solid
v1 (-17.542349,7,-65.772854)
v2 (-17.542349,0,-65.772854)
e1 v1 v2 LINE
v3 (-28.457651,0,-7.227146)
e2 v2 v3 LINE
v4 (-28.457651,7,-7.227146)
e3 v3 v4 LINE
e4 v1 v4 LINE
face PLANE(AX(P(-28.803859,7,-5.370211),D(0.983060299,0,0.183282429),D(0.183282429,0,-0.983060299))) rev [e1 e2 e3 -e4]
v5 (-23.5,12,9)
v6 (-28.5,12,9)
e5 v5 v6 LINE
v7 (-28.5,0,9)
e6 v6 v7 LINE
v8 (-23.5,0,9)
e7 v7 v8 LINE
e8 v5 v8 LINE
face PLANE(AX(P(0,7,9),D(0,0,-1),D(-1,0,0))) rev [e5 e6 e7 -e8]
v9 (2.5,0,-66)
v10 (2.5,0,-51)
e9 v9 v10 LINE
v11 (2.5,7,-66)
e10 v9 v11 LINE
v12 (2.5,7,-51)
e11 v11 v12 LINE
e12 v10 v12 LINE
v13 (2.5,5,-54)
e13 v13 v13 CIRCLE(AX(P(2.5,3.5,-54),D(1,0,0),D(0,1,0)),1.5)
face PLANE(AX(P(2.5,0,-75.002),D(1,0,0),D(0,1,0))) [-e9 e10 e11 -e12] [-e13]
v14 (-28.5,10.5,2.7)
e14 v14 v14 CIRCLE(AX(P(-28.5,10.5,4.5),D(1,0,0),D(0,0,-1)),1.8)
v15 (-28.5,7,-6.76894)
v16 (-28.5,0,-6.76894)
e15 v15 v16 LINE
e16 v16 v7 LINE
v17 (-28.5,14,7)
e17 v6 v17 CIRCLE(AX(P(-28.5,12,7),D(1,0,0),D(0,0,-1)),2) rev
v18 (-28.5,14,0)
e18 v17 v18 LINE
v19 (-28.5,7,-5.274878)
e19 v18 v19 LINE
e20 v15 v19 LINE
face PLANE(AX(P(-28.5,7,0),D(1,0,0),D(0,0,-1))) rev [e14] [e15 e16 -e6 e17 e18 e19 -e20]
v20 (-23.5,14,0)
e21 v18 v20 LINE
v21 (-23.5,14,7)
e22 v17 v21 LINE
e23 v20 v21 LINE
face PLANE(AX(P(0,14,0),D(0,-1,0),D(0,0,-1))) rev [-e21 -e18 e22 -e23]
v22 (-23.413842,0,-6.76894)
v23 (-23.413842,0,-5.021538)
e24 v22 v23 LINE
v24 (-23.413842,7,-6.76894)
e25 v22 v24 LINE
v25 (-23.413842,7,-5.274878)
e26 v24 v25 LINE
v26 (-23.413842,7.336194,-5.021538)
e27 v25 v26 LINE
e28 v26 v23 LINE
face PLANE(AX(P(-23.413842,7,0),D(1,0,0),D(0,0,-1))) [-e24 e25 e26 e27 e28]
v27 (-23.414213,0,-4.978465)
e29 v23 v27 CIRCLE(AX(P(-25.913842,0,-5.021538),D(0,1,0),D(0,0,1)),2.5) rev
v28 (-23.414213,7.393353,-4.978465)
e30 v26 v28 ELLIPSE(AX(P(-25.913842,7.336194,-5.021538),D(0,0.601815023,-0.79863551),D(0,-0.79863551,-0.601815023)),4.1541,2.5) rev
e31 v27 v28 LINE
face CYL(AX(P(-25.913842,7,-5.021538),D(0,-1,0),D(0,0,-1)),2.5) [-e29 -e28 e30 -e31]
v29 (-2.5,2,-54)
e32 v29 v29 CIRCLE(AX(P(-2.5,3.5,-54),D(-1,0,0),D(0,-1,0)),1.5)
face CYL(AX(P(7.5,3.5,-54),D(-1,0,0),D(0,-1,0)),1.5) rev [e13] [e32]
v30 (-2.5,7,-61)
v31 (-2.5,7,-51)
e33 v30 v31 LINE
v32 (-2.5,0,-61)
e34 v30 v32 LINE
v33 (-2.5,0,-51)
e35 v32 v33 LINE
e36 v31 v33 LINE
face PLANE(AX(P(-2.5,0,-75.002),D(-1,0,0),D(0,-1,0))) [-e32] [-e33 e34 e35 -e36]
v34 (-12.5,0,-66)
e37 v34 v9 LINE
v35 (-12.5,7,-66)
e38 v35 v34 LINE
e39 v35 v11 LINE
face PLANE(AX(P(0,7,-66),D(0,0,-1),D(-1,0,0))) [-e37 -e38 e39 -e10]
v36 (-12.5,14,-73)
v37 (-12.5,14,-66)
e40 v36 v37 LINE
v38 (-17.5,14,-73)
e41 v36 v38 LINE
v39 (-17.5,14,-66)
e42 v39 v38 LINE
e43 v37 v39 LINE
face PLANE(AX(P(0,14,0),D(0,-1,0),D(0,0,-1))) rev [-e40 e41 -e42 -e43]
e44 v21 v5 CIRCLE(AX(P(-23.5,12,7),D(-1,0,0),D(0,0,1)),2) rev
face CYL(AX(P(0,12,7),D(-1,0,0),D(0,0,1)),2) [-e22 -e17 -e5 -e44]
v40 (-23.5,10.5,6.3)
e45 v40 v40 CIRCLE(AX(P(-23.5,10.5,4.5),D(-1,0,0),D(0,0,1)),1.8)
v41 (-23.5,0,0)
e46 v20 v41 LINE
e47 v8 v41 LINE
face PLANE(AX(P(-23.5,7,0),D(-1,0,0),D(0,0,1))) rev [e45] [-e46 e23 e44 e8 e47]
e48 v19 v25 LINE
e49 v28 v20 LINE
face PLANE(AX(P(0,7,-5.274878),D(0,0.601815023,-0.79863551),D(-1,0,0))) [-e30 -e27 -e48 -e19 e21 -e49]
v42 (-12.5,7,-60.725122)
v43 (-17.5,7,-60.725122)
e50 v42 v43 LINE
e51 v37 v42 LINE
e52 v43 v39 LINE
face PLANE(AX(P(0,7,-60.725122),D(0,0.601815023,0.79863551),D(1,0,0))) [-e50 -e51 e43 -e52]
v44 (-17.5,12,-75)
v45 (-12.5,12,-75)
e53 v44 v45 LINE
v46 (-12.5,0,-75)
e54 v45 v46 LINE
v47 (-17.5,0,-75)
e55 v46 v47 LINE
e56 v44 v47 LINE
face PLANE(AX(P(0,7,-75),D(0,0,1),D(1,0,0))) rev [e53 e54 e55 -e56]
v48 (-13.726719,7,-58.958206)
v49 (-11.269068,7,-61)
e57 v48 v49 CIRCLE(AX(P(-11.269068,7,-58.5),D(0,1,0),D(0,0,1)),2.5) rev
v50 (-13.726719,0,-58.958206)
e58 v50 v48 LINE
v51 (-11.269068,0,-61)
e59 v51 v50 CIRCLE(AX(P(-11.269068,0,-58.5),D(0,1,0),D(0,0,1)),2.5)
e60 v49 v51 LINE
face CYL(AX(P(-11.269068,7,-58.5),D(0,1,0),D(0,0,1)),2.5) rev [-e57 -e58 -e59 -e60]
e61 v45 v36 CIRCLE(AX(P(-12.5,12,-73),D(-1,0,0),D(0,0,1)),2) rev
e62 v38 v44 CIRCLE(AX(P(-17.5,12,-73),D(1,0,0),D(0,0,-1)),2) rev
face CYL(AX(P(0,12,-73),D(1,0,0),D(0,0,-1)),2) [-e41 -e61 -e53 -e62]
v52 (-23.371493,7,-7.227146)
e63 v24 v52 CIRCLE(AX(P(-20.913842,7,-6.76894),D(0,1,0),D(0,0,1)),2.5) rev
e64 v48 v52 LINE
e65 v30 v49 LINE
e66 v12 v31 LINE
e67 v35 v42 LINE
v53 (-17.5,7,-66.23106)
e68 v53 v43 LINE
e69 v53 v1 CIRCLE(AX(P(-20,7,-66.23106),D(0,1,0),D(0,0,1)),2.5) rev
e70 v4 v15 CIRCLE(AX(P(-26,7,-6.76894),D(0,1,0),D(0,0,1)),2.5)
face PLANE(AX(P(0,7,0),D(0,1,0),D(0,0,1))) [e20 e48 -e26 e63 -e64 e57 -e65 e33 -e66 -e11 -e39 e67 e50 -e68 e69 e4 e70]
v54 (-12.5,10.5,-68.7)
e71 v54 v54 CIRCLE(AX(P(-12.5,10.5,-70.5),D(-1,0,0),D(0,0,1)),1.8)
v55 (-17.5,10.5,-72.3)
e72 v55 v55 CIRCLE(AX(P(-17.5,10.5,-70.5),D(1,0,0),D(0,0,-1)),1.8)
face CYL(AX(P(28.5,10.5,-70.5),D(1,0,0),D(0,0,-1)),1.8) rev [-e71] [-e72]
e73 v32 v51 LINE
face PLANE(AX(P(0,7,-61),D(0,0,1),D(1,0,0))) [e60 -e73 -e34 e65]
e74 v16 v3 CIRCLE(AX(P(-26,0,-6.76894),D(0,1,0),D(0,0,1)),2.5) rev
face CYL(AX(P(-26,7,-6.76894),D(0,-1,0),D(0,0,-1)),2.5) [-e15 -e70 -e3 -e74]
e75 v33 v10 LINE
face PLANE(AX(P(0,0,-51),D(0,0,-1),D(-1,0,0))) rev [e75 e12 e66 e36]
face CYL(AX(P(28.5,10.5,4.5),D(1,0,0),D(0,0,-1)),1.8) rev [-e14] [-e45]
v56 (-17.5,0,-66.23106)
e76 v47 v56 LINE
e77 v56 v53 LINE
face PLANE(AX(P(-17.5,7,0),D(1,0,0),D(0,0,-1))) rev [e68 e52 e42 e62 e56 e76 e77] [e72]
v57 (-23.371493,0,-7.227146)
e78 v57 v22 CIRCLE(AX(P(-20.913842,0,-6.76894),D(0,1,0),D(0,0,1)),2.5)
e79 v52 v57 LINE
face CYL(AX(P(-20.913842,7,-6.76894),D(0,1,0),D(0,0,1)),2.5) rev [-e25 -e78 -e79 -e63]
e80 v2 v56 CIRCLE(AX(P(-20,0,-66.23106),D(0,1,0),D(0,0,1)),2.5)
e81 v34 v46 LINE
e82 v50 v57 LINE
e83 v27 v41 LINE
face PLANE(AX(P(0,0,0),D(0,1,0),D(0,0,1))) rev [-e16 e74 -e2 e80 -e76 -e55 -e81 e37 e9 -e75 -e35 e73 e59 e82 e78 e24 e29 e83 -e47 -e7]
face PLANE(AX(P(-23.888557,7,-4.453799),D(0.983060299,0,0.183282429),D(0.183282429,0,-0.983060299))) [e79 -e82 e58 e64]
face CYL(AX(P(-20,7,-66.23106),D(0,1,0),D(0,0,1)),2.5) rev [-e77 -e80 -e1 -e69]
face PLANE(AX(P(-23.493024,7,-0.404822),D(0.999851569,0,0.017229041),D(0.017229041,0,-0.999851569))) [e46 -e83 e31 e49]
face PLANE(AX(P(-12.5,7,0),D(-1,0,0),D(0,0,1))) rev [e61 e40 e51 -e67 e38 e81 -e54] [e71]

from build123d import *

# Parameters (mm, degrees)
BOSS_EXTRUDE1_DEPTH      = 7
BOSS_EXTRUDE2_START      = 7
SKETCH1_3_W              = 5
SKETCH1_3_H              = 9
BOSS_EXTRUDE2_DEPTH      = 7
M3_CLEARANCE_HOLE1_D     = 3.6
FILLET2_R                = 2.5
BOSS_EXTRUDE3_DEPTH      = 10
BOSS_EXTRUDE3_DEPTH_BACK = 5
SKETCH6_W                = 5
SKETCH6_H                = 7
SKETCH7_R                = 1.5
CUT_EXTRUDE1_DEPTH       = 10
FILLET6_R                = 2
SKETCH8_W                = 84
SKETCH8_H                = 14
CUT_EXTRUDE2_DEPTH       = 83.35289916
CHAMFER2_SIZE            = 7
CHAMFER2_SIZE_2          = 5.274878351


with BuildPart() as part:
    # Sketch1 → Boss-Extrude1 (new body)
    with BuildSketch(Plane(origin=(0, 0, 0), x_dir=(1, 0, 0), z_dir=(0, 1, 0))):
        Polygon((-23.5, -9), (-23.5, 0), (-23.413842004, 5), (-23.413842004, 7), (-13.346045394, 61), (13.346045394, 61), (23.413842004, 7), (23.413842004, 5), (23.5, 0), (23.5, -9), (28.5, -9), (28.5, 7), (17.5, 66), (17.5, 75), (12.5, 75), (12.5, 66), (-12.5, 66), (-12.5, 75), (-17.5, 75), (-17.5, 66), (-28.5, 7), (-28.5, -9), align=None)
    extrude(amount=BOSS_EXTRUDE1_DEPTH)

    # Sketch1<3> → Boss-Extrude2 (add)
    with BuildSketch(Plane(origin=(0, 0, 0), x_dir=(1, 0, 0), z_dir=(0, 1, 0)).offset(BOSS_EXTRUDE2_START)):
        with Locations((-15, 70.5)):
            Rectangle(SKETCH1_3_W, SKETCH1_3_H)
        with Locations((15, 70.5)):
            Rectangle(SKETCH1_3_W, SKETCH1_3_H)
        with Locations((-26, -4.5)):
            Rectangle(SKETCH1_3_W, SKETCH1_3_H)
        with Locations((26, -4.5)):
            Rectangle(SKETCH1_3_W, SKETCH1_3_H)
    extrude(amount=BOSS_EXTRUDE2_DEPTH)

    # M3 Clearance Hole1 (through all)
    with Locations(Plane(origin=(28.5, 0, 0), x_dir=(0, 0, -1), z_dir=(1, 0, 0))):
        with Locations((-4.5, 10.5), (70.5, 10.5)):
            Hole(M3_CLEARANCE_HOLE1_D / 2)

    # Fillet2
    fillet2_edges = [part.edges().sort_by_distance(p)[0] for p in [
        (-28.5, 3.5, -7),
        (-17.5, 3.5, -66),
        (17.5, 3.5, -66),
        (28.5, 3.5, -7),
        (23.413842004, 3.5, -5),
        (23.413842004, 3.5, -7),
        (13.346045394, 3.5, -61),
        (-13.346045394, 3.5, -61),
        (-23.413842004, 3.5, -7),
        (-23.413842004, 3.5, -5),
    ]]
    fillet(fillet2_edges, radius=FILLET2_R)

    # Sketch6 → Boss-Extrude3 (add, two sides: drawn at the far end of the back side and taken through both)
    with BuildSketch(Plane.XY.offset(-61).offset(-BOSS_EXTRUDE3_DEPTH_BACK)):
        with Locations((0, 3.5)):
            Rectangle(SKETCH6_W, SKETCH6_H)
    extrude(amount=BOSS_EXTRUDE3_DEPTH + BOSS_EXTRUDE3_DEPTH_BACK)

    # Sketch7 → Cut-Extrude1 (cut)
    with BuildSketch(Plane.ZY.offset(2.5)):
        with Locations(Location((-54, 3.5, 0), (0, 0, 270))):
            Circle(SKETCH7_R)
    extrude(amount=-CUT_EXTRUDE1_DEPTH, mode=Mode.SUBTRACT)

    # Fillet6
    fillet6_edges = [part.edges().sort_by_distance(p)[0] for p in [
        (26, 14, 9),
        (-15, 14, -75),
        (15, 14, -75),
        (-26, 14, 9),
    ]]
    fillet(fillet6_edges, radius=FILLET6_R)

    # Sketch8 → Cut-Extrude2 (cut, through all)
    with BuildSketch(Plane(origin=(2.5, 0, 0), x_dir=(0, 0, -1), z_dir=(1, 0, 0))):
        with Locations((33, 7)):
            Rectangle(SKETCH8_W, SKETCH8_H)
    extrude(amount=CUT_EXTRUDE2_DEPTH, mode=Mode.SUBTRACT)

    # Chamfer2
    # the kernel refuses this chamfer: 7, 5.274878351 mm, written as the material it adds along each edge
    with BuildSketch(Plane(origin=(-5.436042239, 7, 0), x_dir=(0, 0.9997280272590686, 0.023321052992758308), z_dir=(-1, 0, 0))) as chamfer2_piece_1_section:
        Polygon((CHAMFER2_SIZE * 0.999728027259, CHAMFER2_SIZE * 0.0233210529928), (-CHAMFER2_SIZE_2 * 0.0233210529915, CHAMFER2_SIZE_2 * 0.999728027206), (0, 0), align=None)
    chamfer2_piece_1 = extrude(amount=23.063957761, mode=Mode.PRIVATE)
    chamfer2_piece_1 = split(chamfer2_piece_1, bisect_by=Plane(origin=(-23.413842004, 8.750234769, -2.637085353), z_dir=(-1, 0, 0)), keep=Keep.TOP, mode=Mode.PRIVATE)
    chamfer2_piece_1 = split(chamfer2_piece_1, bisect_by=Plane(origin=(-23.454565548, 8.750234769, -2.636693852), z_dir=(-0.999851569048757, 0, -0.01722904149216463)), keep=Keep.TOP, mode=Mode.PRIVATE)
    add(chamfer2_piece_1)
    with BuildSketch(Plane(origin=(-17.5, 7, -66), x_dir=(2.839775720480132e-15, -0.0410460451010975, 0.9991572559820394), z_dir=(1, 0, 0))) as chamfer2_piece_2:
        Polygon((CHAMFER2_SIZE_2 * 0.999157255929, -CHAMFER2_SIZE_2 * 0.0410460450989), (-CHAMFER2_SIZE * 0.0410460451011, -CHAMFER2_SIZE * 0.999157255982), (0, 0), align=None)
    extrude(amount=5)


solid = part.part
